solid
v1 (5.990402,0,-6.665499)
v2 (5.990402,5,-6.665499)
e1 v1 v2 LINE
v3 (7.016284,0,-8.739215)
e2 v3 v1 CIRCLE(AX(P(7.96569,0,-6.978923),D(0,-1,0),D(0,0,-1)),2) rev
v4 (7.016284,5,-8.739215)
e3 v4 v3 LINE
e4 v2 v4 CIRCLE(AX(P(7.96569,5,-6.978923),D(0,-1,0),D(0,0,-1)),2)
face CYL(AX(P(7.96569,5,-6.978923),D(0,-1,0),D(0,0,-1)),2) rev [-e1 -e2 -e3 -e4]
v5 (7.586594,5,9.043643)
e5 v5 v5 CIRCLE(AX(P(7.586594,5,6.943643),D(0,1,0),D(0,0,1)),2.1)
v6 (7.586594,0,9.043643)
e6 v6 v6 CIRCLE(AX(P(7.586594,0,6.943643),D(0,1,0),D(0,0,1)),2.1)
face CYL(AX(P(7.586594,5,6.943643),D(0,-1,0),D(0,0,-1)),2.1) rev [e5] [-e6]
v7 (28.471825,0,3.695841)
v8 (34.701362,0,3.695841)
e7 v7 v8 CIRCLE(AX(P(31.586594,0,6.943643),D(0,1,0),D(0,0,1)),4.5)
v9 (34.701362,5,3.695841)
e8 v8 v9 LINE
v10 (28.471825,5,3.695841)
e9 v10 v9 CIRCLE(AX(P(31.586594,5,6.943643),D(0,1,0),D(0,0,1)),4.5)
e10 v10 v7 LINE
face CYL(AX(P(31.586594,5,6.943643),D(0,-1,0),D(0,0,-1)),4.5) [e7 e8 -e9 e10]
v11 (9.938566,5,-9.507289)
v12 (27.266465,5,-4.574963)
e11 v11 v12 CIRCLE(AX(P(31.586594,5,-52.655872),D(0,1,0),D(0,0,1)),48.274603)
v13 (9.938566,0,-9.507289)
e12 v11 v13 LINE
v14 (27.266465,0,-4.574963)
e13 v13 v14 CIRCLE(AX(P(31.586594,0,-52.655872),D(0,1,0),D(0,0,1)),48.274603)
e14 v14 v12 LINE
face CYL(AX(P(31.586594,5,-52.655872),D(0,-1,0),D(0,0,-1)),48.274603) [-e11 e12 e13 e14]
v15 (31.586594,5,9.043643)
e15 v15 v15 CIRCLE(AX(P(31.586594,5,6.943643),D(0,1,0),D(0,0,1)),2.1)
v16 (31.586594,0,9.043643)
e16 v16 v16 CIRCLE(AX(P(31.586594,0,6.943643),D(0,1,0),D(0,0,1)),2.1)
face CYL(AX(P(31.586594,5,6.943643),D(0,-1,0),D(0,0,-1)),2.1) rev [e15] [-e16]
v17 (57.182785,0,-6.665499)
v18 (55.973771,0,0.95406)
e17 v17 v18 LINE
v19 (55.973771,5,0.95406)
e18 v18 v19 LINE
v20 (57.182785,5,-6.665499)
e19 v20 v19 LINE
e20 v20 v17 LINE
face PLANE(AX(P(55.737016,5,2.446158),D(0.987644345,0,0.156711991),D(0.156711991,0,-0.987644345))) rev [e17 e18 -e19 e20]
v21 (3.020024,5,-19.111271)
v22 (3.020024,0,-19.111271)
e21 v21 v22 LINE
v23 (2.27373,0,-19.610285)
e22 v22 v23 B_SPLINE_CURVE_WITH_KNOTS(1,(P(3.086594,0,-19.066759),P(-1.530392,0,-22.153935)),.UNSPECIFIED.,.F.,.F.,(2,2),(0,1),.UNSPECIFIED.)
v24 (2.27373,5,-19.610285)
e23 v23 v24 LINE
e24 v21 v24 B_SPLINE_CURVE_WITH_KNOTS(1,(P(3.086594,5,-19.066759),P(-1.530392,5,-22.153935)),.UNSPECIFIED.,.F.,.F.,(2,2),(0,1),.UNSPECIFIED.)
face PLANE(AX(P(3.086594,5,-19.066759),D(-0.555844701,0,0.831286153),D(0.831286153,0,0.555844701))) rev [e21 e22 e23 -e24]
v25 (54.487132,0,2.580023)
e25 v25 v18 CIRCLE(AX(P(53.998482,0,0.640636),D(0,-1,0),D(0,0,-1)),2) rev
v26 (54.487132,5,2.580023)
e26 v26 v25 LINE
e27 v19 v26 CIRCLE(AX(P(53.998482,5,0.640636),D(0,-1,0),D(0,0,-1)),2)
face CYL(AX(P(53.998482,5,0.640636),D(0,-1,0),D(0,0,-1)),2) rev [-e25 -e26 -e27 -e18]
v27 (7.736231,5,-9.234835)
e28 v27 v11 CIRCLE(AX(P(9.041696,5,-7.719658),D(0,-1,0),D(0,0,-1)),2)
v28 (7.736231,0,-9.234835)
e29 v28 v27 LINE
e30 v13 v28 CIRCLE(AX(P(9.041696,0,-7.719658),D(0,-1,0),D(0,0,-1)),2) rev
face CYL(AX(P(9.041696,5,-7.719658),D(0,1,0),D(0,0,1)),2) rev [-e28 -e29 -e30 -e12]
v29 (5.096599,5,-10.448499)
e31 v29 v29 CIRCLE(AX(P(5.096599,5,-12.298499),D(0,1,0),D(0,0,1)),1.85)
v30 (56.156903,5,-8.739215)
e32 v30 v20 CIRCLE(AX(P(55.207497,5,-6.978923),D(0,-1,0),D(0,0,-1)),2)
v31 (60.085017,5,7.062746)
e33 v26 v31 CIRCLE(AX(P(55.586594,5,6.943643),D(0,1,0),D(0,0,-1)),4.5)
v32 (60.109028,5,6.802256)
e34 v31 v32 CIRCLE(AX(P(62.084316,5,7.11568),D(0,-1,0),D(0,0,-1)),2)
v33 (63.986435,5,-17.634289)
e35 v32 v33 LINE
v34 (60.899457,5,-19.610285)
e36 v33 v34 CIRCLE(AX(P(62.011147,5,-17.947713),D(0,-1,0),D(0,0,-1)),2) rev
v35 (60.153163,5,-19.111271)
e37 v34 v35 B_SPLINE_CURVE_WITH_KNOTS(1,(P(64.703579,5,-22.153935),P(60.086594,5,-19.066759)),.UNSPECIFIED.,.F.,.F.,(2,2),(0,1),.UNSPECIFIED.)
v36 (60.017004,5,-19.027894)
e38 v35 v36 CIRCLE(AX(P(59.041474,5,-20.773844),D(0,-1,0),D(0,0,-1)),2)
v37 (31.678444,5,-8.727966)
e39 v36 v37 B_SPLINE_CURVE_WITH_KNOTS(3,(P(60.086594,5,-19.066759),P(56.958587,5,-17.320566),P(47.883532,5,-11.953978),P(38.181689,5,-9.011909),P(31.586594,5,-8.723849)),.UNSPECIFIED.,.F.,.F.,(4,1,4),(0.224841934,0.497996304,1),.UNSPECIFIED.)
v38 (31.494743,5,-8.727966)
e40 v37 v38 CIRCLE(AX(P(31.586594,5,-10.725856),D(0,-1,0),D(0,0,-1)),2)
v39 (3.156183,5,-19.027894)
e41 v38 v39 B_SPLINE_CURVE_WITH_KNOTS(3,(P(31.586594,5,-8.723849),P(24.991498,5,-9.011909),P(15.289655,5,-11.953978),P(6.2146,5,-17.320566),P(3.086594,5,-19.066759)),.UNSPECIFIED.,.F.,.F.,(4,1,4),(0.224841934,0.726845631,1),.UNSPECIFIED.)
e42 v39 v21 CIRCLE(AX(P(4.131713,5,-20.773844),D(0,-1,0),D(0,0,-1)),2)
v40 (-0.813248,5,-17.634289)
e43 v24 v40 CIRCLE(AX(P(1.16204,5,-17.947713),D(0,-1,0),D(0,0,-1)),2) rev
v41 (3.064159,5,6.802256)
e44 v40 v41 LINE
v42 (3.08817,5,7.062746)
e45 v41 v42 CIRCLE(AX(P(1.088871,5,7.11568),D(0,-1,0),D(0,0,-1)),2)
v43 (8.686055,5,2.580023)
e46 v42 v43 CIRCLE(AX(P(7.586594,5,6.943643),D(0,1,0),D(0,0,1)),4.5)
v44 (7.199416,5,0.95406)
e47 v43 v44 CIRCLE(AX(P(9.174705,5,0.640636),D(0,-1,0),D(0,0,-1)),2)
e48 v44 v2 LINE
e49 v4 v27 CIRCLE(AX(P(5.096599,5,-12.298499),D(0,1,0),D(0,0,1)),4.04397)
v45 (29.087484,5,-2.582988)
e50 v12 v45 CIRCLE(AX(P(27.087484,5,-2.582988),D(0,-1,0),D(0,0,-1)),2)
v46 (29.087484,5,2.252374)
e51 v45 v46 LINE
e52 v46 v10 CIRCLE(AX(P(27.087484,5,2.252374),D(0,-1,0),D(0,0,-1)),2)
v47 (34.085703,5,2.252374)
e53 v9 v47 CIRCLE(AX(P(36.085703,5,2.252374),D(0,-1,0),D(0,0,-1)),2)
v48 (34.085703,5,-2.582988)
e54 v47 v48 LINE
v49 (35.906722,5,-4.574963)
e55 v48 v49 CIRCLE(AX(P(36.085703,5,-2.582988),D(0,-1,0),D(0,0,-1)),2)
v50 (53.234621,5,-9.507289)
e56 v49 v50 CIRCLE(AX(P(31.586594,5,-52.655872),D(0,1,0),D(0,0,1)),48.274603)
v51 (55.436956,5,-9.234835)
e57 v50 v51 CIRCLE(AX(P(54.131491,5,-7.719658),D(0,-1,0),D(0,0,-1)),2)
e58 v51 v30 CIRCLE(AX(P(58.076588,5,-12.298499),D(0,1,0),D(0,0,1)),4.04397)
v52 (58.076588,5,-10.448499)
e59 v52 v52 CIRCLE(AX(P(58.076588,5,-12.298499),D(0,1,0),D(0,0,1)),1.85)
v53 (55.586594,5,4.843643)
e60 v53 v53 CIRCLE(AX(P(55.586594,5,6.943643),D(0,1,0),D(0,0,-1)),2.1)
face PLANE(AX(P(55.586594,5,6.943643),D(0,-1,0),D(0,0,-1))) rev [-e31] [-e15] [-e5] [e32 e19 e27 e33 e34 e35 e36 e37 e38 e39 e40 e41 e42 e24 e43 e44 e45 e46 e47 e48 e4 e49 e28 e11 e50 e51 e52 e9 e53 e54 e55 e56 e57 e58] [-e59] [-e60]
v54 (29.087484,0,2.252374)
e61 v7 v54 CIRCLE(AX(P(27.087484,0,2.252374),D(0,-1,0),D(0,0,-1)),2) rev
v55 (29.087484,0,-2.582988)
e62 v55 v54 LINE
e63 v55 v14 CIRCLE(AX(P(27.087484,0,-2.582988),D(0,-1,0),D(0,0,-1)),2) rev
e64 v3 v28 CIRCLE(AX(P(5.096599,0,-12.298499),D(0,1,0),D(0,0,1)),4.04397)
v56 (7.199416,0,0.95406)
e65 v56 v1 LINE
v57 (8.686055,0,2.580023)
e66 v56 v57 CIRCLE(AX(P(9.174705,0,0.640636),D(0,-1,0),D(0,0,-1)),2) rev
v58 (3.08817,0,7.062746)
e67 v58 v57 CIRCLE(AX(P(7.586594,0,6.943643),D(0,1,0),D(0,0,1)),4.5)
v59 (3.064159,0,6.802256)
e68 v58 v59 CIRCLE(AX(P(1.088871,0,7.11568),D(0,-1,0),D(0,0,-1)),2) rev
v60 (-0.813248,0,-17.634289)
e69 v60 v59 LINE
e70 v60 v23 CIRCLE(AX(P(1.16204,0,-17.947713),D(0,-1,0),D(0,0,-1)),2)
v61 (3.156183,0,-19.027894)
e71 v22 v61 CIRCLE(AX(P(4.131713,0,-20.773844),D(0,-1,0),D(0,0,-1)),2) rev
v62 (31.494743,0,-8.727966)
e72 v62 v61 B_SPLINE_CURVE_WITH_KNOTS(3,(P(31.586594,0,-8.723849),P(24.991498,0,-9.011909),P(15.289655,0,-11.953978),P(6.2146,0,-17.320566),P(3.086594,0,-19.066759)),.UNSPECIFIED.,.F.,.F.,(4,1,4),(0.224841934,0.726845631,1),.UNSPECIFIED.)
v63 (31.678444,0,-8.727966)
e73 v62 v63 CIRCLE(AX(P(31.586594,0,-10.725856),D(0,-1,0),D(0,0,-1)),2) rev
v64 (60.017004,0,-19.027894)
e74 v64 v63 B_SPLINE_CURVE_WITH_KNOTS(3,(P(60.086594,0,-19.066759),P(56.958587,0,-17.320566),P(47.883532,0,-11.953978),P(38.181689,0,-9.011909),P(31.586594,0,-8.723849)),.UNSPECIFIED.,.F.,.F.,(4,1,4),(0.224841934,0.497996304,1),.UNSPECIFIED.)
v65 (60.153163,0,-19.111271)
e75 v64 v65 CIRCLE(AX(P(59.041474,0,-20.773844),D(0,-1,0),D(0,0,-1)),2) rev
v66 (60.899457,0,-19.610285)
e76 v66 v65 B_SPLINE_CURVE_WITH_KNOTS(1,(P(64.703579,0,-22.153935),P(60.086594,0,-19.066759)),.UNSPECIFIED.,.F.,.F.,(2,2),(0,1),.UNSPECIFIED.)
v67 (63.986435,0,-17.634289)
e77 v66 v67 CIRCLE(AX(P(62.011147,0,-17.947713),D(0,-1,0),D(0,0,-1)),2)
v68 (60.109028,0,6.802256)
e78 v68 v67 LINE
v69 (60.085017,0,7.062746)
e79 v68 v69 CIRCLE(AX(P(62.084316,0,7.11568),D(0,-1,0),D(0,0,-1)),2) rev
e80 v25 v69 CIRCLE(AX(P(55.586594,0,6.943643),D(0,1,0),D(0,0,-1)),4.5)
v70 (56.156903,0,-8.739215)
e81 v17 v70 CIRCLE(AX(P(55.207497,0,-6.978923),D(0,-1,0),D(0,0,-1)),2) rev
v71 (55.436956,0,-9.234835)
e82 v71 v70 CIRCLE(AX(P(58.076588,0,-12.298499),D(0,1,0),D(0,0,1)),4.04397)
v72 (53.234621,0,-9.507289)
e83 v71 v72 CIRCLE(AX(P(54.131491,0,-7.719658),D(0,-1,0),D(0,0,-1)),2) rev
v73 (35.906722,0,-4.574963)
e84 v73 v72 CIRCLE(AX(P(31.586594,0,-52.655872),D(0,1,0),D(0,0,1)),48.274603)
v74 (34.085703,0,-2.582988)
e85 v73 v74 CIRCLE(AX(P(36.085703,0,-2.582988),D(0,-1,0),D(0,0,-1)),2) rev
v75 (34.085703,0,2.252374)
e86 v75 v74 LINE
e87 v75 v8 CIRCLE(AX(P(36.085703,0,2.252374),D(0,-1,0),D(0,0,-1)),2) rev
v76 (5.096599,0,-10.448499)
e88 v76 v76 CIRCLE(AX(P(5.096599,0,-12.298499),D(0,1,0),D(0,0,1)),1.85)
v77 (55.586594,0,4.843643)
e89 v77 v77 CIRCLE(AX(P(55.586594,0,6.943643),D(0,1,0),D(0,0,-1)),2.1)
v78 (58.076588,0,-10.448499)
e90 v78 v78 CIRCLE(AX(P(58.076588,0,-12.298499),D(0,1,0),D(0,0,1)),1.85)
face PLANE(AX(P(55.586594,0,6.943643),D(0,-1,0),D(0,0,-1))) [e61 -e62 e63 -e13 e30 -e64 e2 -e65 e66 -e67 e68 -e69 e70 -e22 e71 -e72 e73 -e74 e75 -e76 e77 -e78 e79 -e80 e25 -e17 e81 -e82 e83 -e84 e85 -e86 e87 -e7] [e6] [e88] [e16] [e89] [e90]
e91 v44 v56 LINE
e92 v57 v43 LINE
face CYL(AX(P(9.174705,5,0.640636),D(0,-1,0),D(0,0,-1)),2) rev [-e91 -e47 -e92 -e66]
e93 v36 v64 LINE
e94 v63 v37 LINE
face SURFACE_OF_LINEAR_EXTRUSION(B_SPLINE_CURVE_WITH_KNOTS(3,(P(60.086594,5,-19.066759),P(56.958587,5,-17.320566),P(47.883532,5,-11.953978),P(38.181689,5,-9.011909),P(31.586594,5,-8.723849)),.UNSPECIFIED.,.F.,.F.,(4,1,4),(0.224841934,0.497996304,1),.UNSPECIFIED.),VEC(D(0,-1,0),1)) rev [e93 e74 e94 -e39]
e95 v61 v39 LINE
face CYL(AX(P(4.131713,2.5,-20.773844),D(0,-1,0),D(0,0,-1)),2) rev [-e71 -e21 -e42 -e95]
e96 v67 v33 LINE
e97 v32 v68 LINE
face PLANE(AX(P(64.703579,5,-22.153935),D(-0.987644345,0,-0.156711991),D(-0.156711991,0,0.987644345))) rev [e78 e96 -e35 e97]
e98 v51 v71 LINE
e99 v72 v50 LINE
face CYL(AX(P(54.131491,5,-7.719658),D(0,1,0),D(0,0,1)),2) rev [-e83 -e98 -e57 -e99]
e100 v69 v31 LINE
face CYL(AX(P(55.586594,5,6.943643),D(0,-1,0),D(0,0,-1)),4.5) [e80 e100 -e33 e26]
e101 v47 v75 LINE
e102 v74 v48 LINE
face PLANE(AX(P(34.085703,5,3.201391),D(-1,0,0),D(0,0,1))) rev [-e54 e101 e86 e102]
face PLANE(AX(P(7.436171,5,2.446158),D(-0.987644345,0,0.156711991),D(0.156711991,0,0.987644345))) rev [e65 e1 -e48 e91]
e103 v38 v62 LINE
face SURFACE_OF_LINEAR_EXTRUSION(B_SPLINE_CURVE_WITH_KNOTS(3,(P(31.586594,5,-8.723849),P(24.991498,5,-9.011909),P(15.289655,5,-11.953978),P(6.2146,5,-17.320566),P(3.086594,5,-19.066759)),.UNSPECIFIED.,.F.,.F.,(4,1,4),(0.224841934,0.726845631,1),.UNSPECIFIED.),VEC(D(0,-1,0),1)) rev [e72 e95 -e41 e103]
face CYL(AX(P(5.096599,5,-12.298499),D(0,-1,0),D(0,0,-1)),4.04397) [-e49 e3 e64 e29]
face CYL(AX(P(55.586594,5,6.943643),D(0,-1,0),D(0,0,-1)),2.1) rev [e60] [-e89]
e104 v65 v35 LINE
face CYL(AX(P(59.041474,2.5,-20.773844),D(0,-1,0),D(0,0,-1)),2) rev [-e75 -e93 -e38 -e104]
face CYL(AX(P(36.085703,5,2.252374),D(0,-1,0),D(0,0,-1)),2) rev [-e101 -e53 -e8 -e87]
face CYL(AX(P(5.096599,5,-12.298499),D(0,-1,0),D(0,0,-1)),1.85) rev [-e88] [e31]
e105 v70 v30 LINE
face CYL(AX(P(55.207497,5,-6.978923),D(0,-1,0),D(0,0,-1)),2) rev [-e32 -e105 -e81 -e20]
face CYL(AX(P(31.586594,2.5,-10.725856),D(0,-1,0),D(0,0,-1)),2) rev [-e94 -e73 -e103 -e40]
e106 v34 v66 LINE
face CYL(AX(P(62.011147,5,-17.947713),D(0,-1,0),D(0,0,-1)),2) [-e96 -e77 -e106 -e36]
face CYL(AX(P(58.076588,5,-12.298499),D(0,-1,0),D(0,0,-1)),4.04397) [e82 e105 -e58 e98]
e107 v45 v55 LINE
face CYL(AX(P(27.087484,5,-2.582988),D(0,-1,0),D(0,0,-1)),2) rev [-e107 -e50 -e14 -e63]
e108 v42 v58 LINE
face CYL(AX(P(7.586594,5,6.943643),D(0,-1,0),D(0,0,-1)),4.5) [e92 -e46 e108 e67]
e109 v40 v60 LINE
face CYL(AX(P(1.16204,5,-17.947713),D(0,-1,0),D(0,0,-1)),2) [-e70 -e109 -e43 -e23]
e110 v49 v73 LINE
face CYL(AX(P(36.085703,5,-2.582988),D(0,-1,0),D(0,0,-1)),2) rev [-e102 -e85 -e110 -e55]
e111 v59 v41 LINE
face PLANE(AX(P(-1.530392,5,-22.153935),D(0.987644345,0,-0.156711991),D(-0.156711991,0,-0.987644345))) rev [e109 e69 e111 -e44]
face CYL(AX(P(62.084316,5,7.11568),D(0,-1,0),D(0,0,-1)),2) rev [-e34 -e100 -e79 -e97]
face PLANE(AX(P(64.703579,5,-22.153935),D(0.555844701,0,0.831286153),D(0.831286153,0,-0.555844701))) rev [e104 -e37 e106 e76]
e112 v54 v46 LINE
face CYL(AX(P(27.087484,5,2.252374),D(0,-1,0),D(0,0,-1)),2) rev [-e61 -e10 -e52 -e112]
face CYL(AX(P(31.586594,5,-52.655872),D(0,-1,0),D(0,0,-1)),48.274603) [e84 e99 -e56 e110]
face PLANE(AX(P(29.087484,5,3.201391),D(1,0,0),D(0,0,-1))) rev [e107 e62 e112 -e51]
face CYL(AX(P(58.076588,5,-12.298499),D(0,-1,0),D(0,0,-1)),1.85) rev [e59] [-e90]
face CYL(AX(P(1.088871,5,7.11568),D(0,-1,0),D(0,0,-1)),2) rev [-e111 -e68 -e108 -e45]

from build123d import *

# Parameters (mm, degrees)
SKETCH1_R           = 2.1
SKETCH1_R_2         = 1.85
BOSS_EXTRUDE1_DEPTH = 5
FILLET1_R           = 2


with BuildPart() as part:
    # Sketch1 → Boss-Extrude1 (new body)
    with BuildSketch(Plane(origin=(0, 0, 0), x_dir=(1, 0, 0), z_dir=(0, 1, 0))):
        with BuildLine():
            Line((64.703578791, 22.153935156), (60.086593503, -6.943643112))
            ThreePointArc((60.086593503, -6.943643112), (52.351867725, -10.071989183), (55.737016108, -2.446157921))
            Line((55.737016108, -2.446157921), (57.44284906, 8.304495315))
            ThreePointArc((57.44284906, 8.304495315), (55.811241442, 8.948588976), (54.605866, 10.222979068))
            ThreePointArc((54.605866, 10.222979068), (44.668654946, 6.187635781), (34.085703384, 4.445999995))
            Line((34.085703384, 4.445999995), (34.085703384, -3.201391143))
            ThreePointArc((34.085703384, -3.201391143), (31.586593503, -11.443643112), (29.087483622, -3.201391143))
            Line((29.087483622, -3.201391143), (29.087483622, 4.445999995))
            ThreePointArc((29.087483622, 4.445999995), (18.504532059, 6.187635781), (8.567321006, 10.222979068))
            ThreePointArc((8.567321006, 10.222979068), (7.361945564, 8.948588976), (5.730337946, 8.304495315))
            Line((5.730337946, 8.304495315), (7.436170898, -2.446157921))
            ThreePointArc((7.436170898, -2.446157921), (10.821319281, -10.071989183), (3.086593503, -6.943643112))
            Line((3.086593503, -6.943643112), (-1.530391785, 22.153935156))
            Line((-1.530391785, 22.153935156), (3.086593503, 19.066758984))
            add(Edge.make_bspline(
                [(3.086593503, 19.066758984), (6.214599524, 17.320565922), (15.289655428, 11.953978367), (24.991497583, 9.011909138), (31.586593503, 8.723848672)],
                knots=[0.224841934, 0.224841934, 0.224841934, 0.224841934, 0.497996304, 1, 1, 1, 1], degree=3))
            add(Edge.make_bspline(
                [(60.086593503, 19.066758984), (56.958587482, 17.320565922), (47.883531578, 11.953978367), (38.181689422, 9.011909138), (31.586593503, 8.723848672)],
                knots=[0.224841934, 0.224841934, 0.224841934, 0.224841934, 0.497996304, 1, 1, 1, 1], degree=3))
            Line((60.086593503, 19.066758984), (64.703578791, 22.153935156))
        make_face()
        with Locations(Location((7.586593503, -6.943643112, 0), (0, 0, 270))):
            Circle(SKETCH1_R, mode=Mode.SUBTRACT)
        with Locations(Location((55.586593503, -6.943643112, 0), (0, 0, 90))):
            Circle(SKETCH1_R, mode=Mode.SUBTRACT)
        with Locations(Location((31.586593503, -6.943643112, 0), (0, 0, 270))):
            Circle(SKETCH1_R, mode=Mode.SUBTRACT)
        with Locations(Location((5.096599352, 12.298499455, 0), (0, 0, 270))):
            Circle(SKETCH1_R_2, mode=Mode.SUBTRACT)
        with Locations(Location((58.076587654, 12.298499455, 0), (0, 0, 270))):
            Circle(SKETCH1_R_2, mode=Mode.SUBTRACT)
    extrude(amount=BOSS_EXTRUDE1_DEPTH)

    # Fillet1
    # the kernel refuses this fillet: 2 mm, written as the material it adds along each edge
    with BuildSketch(Plane(origin=(60.086593503, 0, 6.943643112), x_dir=(0.15671199054579144, 0, -0.9876443449031517), z_dir=(0, 1, 0))) as fillet1_piece_1:
        with BuildLine():
            CenterArc((0.14315588, -2), FILLET1_R, 90, 7.499462887)
            ThreePointArc((-0.117877916, -0.01710783), (-0.058882351, -0.008943954), (0, 0))
            Line((0, 0), (0.14315588, 0))
        make_face()
    extrude(amount=5)
    with BuildSketch(Plane(origin=(55.737016108, 0, 2.446157921), x_dir=(-0.9943134943930577, 0, 0.1064926047566996), z_dir=(0, 1, 0))) as fillet1_piece_2:
        with BuildLine():
            CenterArc((1.536372783, -1.980396143), FILLET1_R, 98.028765666, 66.841966003)
            Line((-0.39430608, -1.458400811), (0, 0))
            ThreePointArc((0, 0), (0.628516139, -0.044108679), (1.257032277, 0))
        make_face()
    extrude(amount=5)
    with BuildSketch(Plane(origin=(57.44284906, 0, -8.304495315), x_dir=(-0.15671199054619364, 0, 0.9876443449030878), z_dir=(0, 1, 0))) as fillet1_piece_3:
        with BuildLine():
            CenterArc((1.659500293, -2), FILLET1_R, 90, 70.676083633)
            ThreePointArc((-0.227825519, -1.338183351), (-0.057363225, -0.678719225), (0, 0))
            Line((0, 0), (1.659500293, 0))
        make_face()
    extrude(amount=5)
    with BuildSketch(Plane(origin=(54.605866, 0, -10.222979068), x_dir=(0.6436684340700369, 0, 0.7653044799175203), z_dir=(0, 1, 0))) as fillet1_piece_4:
        with BuildLine():
            CenterArc((1.610462564, -1.974349834), FILLET1_R, 99.186138147, 67.391276413)
            ThreePointArc((-0.334906336, -1.510087145), (-0.161404643, -0.756385011), (0, 0))
            ThreePointArc((0, 0), (0.645588922, -0.051864251), (1.291177843, 0))
        make_face()
    extrude(amount=5)
    with BuildSketch(Plane(origin=(34.085703384, 0, -4.445999995), x_dir=(0, 0, 1), z_dir=(0, 1, 0))) as fillet1_piece_5:
        with BuildLine():
            CenterArc((1.863012192, 2), FILLET1_R, 185.134308641, 84.865691359)
            ThreePointArc((-0.128963122, 1.821018582), (-0.055872709, 0.911118963), (0, 0))
            Line((0, 0), (1.863012192, 0))
        make_face()
    extrude(amount=5)
    with BuildSketch(Plane(origin=(34.085703384, 0, 3.201391143), x_dir=(0, 0, -1), z_dir=(0, 1, 0))) as fillet1_piece_6:
        with BuildLine():
            CenterArc((0.949017611, -2), FILLET1_R, 90, 46.197810795)
            ThreePointArc((-0.494449952, -0.615658498), (-0.233694925, -0.318695554), (0, 0))
            Line((0, 0), (0.949017611, 0))
        make_face()
    extrude(amount=5)
    with BuildSketch(Plane(origin=(29.087483622, 0, 3.201391143), x_dir=(-0.7796793430593535, 0, 0.6261789855995925), z_dir=(0, 1, 0))) as fillet1_piece_7:
        with BuildLine():
            CenterArc((0.965103801, -1.992287399), FILLET1_R, 95.03341493, 46.197810795)
            Line((-0.594254885, -0.739929428), (0, 0))
            ThreePointArc((0, 0), (0.394815191, -0.017353353), (0.789630383, 0))
        make_face()
    extrude(amount=5)
    with BuildSketch(Plane(origin=(29.087483622, 0, -4.445999995), x_dir=(0, 0, 1), z_dir=(0, 1, 0))) as fillet1_piece_8:
        with BuildLine():
            CenterArc((1.863012192, -2), FILLET1_R, 90, 84.865691359)
            ThreePointArc((-0.128963122, -1.821018582), (-0.055872709, -0.911118963), (0, 0))
            Line((0, 0), (1.863012192, 0))
        make_face()
    extrude(amount=5)
    with BuildSketch(Plane(origin=(5.730337946, 0, -8.304495315), x_dir=(0.9473329914518264, 0, -0.3202502198390094), z_dir=(0, 1, 0))) as fillet1_piece_9:
        with BuildLine():
            CenterArc((1.69310821, -1.971630242), FILLET1_R, 99.661958184, 70.676083633)
            Line((-0.278522032, -1.635960483), (0, 0))
            ThreePointArc((0, 0), (0.678719225, -0.057363225), (1.357438451, 0))
        make_face()
    extrude(amount=5)
    with BuildSketch(Plane(origin=(7.436170898, 0, 2.446157921), x_dir=(-0.15671199054620055, 0, -0.987644344903087), z_dir=(0, 1, 0))) as fillet1_piece_10:
        with BuildLine():
            CenterArc((1.510764777, -2), FILLET1_R, 90, 66.841966003)
            ThreePointArc((-0.32808249, -1.213462824), (-0.121461398, -0.618243674), (0, 0))
            Line((0, 0), (1.510764777, 0))
        make_face()
    extrude(amount=5)
    with BuildSketch(Plane(origin=(3.086593503, 0, 6.943643112), x_dir=(0.013234765762904084, 0, 0.9999124166521791), z_dir=(0, 1, 0))) as fillet1_piece_11:
        with BuildLine():
            CenterArc((0.145582423, -1.999824833), FILLET1_R, 90.75831836, 7.499462887)
            Line((-0.141671624, -0.020561053), (0, 0))
            ThreePointArc((0, 0), (0.059556446, -0.000394125), (0.119112892, 0))
        make_face()
    extrude(amount=5)
    with BuildSketch(Plane(origin=(3.086593503, 0, -19.066758984), x_dir=(-0.831286153352586, 0, -0.5558447006532138), z_dir=(0, 1, 0))) as fillet1_piece_12:
        with BuildLine():
            CenterArc((0.080080644, -2), FILLET1_R, 90, 4.575133674)
            ThreePointArc((-0.079451987, -0.006372818), (-0.039725694, -0.003190148), (0, 0))
            Line((0, 0), (0.080080644, 0))
        make_face()
    extrude(amount=5)
    with BuildSketch(Plane(origin=(31.586593503, 0, -8.723848672), x_dir=(-0.9989968341104656, 0, -0.044780860166667026), z_dir=(0, 1, 0))) as fillet1_piece_13:
        with BuildLine():
            CenterArc((0.089651597, -1.999998688), FILLET1_R, 89.934377151, 5.264470885)
            ThreePointArc((-0.091573518, -0.008226247), (-0.045789115, -0.0040869), (0, 0))
            ThreePointArc((0, 0), (0.045971133, 2.6329e-05), (0.091942266, 0))
        make_face()
    extrude(amount=5)
    with BuildSketch(Plane(origin=(60.086593503, 0, -19.066758984), x_dir=(-0.8730663040204696, 0, 0.4876015061338889), z_dir=(0, 1, 0))) as fillet1_piece_14:
        with BuildLine():
            CenterArc((0.080081519, -1.999999965), FILLET1_R, 90.010724643, 4.575133674)
            Line((-0.079824277, -0.00640268), (0, 0))
            ThreePointArc((0, 0), (0.039853579, -3.751e-06), (0.079707158, 0))
        make_face()
    extrude(amount=5)
    with BuildSketch(Plane(origin=(8.567321006, 0, -10.222979068), x_dir=(0.8865164621041475, 0, 0.46269705252826665), z_dir=(0, 1, 0))) as fillet1_piece_15:
        with BuildLine():
            CenterArc((1.578820312, -1.999743323), FILLET1_R, 90.91795372, 67.391276413)
            ThreePointArc((-0.279563936, -1.260549177), (-0.089148014, -0.64150416), (0, 0))
            ThreePointArc((0, 0), (0.773389527, -0.006195491), (1.546779054, 0))
        make_face()
    extrude(amount=5)
    # the kernel refuses this fillet: 2 mm, written as the material it takes off along each edge
    with BuildSketch(Plane(origin=(64.703578791, -11.440469637, -22.153935156), x_dir=(-0.831286153352585, 0, 0.5558447006532152), z_dir=(0, 1, 0)), Plane(origin=(-1.530391785, -11.440469637, -22.153935156), x_dir=(0.15671199054620674, 0, 0.987644344903086), z_dir=(0, 1, 0))) as fillet1_2_piece_1:
        with BuildLine():
            CenterArc((FILLET1_R * 2.28809392748, FILLET1_R), FILLET1_R, 137.214985003, 132.785014997)
            Line((FILLET1_R * 1.5541863886, FILLET1_R * 1.67924938305), (0, 0))
            Line((0, 0), (FILLET1_R * 2.28809392748, 0))
        make_face()
    extrude(amount=27.880939275, mode=Mode.SUBTRACT)


solid = part.part
